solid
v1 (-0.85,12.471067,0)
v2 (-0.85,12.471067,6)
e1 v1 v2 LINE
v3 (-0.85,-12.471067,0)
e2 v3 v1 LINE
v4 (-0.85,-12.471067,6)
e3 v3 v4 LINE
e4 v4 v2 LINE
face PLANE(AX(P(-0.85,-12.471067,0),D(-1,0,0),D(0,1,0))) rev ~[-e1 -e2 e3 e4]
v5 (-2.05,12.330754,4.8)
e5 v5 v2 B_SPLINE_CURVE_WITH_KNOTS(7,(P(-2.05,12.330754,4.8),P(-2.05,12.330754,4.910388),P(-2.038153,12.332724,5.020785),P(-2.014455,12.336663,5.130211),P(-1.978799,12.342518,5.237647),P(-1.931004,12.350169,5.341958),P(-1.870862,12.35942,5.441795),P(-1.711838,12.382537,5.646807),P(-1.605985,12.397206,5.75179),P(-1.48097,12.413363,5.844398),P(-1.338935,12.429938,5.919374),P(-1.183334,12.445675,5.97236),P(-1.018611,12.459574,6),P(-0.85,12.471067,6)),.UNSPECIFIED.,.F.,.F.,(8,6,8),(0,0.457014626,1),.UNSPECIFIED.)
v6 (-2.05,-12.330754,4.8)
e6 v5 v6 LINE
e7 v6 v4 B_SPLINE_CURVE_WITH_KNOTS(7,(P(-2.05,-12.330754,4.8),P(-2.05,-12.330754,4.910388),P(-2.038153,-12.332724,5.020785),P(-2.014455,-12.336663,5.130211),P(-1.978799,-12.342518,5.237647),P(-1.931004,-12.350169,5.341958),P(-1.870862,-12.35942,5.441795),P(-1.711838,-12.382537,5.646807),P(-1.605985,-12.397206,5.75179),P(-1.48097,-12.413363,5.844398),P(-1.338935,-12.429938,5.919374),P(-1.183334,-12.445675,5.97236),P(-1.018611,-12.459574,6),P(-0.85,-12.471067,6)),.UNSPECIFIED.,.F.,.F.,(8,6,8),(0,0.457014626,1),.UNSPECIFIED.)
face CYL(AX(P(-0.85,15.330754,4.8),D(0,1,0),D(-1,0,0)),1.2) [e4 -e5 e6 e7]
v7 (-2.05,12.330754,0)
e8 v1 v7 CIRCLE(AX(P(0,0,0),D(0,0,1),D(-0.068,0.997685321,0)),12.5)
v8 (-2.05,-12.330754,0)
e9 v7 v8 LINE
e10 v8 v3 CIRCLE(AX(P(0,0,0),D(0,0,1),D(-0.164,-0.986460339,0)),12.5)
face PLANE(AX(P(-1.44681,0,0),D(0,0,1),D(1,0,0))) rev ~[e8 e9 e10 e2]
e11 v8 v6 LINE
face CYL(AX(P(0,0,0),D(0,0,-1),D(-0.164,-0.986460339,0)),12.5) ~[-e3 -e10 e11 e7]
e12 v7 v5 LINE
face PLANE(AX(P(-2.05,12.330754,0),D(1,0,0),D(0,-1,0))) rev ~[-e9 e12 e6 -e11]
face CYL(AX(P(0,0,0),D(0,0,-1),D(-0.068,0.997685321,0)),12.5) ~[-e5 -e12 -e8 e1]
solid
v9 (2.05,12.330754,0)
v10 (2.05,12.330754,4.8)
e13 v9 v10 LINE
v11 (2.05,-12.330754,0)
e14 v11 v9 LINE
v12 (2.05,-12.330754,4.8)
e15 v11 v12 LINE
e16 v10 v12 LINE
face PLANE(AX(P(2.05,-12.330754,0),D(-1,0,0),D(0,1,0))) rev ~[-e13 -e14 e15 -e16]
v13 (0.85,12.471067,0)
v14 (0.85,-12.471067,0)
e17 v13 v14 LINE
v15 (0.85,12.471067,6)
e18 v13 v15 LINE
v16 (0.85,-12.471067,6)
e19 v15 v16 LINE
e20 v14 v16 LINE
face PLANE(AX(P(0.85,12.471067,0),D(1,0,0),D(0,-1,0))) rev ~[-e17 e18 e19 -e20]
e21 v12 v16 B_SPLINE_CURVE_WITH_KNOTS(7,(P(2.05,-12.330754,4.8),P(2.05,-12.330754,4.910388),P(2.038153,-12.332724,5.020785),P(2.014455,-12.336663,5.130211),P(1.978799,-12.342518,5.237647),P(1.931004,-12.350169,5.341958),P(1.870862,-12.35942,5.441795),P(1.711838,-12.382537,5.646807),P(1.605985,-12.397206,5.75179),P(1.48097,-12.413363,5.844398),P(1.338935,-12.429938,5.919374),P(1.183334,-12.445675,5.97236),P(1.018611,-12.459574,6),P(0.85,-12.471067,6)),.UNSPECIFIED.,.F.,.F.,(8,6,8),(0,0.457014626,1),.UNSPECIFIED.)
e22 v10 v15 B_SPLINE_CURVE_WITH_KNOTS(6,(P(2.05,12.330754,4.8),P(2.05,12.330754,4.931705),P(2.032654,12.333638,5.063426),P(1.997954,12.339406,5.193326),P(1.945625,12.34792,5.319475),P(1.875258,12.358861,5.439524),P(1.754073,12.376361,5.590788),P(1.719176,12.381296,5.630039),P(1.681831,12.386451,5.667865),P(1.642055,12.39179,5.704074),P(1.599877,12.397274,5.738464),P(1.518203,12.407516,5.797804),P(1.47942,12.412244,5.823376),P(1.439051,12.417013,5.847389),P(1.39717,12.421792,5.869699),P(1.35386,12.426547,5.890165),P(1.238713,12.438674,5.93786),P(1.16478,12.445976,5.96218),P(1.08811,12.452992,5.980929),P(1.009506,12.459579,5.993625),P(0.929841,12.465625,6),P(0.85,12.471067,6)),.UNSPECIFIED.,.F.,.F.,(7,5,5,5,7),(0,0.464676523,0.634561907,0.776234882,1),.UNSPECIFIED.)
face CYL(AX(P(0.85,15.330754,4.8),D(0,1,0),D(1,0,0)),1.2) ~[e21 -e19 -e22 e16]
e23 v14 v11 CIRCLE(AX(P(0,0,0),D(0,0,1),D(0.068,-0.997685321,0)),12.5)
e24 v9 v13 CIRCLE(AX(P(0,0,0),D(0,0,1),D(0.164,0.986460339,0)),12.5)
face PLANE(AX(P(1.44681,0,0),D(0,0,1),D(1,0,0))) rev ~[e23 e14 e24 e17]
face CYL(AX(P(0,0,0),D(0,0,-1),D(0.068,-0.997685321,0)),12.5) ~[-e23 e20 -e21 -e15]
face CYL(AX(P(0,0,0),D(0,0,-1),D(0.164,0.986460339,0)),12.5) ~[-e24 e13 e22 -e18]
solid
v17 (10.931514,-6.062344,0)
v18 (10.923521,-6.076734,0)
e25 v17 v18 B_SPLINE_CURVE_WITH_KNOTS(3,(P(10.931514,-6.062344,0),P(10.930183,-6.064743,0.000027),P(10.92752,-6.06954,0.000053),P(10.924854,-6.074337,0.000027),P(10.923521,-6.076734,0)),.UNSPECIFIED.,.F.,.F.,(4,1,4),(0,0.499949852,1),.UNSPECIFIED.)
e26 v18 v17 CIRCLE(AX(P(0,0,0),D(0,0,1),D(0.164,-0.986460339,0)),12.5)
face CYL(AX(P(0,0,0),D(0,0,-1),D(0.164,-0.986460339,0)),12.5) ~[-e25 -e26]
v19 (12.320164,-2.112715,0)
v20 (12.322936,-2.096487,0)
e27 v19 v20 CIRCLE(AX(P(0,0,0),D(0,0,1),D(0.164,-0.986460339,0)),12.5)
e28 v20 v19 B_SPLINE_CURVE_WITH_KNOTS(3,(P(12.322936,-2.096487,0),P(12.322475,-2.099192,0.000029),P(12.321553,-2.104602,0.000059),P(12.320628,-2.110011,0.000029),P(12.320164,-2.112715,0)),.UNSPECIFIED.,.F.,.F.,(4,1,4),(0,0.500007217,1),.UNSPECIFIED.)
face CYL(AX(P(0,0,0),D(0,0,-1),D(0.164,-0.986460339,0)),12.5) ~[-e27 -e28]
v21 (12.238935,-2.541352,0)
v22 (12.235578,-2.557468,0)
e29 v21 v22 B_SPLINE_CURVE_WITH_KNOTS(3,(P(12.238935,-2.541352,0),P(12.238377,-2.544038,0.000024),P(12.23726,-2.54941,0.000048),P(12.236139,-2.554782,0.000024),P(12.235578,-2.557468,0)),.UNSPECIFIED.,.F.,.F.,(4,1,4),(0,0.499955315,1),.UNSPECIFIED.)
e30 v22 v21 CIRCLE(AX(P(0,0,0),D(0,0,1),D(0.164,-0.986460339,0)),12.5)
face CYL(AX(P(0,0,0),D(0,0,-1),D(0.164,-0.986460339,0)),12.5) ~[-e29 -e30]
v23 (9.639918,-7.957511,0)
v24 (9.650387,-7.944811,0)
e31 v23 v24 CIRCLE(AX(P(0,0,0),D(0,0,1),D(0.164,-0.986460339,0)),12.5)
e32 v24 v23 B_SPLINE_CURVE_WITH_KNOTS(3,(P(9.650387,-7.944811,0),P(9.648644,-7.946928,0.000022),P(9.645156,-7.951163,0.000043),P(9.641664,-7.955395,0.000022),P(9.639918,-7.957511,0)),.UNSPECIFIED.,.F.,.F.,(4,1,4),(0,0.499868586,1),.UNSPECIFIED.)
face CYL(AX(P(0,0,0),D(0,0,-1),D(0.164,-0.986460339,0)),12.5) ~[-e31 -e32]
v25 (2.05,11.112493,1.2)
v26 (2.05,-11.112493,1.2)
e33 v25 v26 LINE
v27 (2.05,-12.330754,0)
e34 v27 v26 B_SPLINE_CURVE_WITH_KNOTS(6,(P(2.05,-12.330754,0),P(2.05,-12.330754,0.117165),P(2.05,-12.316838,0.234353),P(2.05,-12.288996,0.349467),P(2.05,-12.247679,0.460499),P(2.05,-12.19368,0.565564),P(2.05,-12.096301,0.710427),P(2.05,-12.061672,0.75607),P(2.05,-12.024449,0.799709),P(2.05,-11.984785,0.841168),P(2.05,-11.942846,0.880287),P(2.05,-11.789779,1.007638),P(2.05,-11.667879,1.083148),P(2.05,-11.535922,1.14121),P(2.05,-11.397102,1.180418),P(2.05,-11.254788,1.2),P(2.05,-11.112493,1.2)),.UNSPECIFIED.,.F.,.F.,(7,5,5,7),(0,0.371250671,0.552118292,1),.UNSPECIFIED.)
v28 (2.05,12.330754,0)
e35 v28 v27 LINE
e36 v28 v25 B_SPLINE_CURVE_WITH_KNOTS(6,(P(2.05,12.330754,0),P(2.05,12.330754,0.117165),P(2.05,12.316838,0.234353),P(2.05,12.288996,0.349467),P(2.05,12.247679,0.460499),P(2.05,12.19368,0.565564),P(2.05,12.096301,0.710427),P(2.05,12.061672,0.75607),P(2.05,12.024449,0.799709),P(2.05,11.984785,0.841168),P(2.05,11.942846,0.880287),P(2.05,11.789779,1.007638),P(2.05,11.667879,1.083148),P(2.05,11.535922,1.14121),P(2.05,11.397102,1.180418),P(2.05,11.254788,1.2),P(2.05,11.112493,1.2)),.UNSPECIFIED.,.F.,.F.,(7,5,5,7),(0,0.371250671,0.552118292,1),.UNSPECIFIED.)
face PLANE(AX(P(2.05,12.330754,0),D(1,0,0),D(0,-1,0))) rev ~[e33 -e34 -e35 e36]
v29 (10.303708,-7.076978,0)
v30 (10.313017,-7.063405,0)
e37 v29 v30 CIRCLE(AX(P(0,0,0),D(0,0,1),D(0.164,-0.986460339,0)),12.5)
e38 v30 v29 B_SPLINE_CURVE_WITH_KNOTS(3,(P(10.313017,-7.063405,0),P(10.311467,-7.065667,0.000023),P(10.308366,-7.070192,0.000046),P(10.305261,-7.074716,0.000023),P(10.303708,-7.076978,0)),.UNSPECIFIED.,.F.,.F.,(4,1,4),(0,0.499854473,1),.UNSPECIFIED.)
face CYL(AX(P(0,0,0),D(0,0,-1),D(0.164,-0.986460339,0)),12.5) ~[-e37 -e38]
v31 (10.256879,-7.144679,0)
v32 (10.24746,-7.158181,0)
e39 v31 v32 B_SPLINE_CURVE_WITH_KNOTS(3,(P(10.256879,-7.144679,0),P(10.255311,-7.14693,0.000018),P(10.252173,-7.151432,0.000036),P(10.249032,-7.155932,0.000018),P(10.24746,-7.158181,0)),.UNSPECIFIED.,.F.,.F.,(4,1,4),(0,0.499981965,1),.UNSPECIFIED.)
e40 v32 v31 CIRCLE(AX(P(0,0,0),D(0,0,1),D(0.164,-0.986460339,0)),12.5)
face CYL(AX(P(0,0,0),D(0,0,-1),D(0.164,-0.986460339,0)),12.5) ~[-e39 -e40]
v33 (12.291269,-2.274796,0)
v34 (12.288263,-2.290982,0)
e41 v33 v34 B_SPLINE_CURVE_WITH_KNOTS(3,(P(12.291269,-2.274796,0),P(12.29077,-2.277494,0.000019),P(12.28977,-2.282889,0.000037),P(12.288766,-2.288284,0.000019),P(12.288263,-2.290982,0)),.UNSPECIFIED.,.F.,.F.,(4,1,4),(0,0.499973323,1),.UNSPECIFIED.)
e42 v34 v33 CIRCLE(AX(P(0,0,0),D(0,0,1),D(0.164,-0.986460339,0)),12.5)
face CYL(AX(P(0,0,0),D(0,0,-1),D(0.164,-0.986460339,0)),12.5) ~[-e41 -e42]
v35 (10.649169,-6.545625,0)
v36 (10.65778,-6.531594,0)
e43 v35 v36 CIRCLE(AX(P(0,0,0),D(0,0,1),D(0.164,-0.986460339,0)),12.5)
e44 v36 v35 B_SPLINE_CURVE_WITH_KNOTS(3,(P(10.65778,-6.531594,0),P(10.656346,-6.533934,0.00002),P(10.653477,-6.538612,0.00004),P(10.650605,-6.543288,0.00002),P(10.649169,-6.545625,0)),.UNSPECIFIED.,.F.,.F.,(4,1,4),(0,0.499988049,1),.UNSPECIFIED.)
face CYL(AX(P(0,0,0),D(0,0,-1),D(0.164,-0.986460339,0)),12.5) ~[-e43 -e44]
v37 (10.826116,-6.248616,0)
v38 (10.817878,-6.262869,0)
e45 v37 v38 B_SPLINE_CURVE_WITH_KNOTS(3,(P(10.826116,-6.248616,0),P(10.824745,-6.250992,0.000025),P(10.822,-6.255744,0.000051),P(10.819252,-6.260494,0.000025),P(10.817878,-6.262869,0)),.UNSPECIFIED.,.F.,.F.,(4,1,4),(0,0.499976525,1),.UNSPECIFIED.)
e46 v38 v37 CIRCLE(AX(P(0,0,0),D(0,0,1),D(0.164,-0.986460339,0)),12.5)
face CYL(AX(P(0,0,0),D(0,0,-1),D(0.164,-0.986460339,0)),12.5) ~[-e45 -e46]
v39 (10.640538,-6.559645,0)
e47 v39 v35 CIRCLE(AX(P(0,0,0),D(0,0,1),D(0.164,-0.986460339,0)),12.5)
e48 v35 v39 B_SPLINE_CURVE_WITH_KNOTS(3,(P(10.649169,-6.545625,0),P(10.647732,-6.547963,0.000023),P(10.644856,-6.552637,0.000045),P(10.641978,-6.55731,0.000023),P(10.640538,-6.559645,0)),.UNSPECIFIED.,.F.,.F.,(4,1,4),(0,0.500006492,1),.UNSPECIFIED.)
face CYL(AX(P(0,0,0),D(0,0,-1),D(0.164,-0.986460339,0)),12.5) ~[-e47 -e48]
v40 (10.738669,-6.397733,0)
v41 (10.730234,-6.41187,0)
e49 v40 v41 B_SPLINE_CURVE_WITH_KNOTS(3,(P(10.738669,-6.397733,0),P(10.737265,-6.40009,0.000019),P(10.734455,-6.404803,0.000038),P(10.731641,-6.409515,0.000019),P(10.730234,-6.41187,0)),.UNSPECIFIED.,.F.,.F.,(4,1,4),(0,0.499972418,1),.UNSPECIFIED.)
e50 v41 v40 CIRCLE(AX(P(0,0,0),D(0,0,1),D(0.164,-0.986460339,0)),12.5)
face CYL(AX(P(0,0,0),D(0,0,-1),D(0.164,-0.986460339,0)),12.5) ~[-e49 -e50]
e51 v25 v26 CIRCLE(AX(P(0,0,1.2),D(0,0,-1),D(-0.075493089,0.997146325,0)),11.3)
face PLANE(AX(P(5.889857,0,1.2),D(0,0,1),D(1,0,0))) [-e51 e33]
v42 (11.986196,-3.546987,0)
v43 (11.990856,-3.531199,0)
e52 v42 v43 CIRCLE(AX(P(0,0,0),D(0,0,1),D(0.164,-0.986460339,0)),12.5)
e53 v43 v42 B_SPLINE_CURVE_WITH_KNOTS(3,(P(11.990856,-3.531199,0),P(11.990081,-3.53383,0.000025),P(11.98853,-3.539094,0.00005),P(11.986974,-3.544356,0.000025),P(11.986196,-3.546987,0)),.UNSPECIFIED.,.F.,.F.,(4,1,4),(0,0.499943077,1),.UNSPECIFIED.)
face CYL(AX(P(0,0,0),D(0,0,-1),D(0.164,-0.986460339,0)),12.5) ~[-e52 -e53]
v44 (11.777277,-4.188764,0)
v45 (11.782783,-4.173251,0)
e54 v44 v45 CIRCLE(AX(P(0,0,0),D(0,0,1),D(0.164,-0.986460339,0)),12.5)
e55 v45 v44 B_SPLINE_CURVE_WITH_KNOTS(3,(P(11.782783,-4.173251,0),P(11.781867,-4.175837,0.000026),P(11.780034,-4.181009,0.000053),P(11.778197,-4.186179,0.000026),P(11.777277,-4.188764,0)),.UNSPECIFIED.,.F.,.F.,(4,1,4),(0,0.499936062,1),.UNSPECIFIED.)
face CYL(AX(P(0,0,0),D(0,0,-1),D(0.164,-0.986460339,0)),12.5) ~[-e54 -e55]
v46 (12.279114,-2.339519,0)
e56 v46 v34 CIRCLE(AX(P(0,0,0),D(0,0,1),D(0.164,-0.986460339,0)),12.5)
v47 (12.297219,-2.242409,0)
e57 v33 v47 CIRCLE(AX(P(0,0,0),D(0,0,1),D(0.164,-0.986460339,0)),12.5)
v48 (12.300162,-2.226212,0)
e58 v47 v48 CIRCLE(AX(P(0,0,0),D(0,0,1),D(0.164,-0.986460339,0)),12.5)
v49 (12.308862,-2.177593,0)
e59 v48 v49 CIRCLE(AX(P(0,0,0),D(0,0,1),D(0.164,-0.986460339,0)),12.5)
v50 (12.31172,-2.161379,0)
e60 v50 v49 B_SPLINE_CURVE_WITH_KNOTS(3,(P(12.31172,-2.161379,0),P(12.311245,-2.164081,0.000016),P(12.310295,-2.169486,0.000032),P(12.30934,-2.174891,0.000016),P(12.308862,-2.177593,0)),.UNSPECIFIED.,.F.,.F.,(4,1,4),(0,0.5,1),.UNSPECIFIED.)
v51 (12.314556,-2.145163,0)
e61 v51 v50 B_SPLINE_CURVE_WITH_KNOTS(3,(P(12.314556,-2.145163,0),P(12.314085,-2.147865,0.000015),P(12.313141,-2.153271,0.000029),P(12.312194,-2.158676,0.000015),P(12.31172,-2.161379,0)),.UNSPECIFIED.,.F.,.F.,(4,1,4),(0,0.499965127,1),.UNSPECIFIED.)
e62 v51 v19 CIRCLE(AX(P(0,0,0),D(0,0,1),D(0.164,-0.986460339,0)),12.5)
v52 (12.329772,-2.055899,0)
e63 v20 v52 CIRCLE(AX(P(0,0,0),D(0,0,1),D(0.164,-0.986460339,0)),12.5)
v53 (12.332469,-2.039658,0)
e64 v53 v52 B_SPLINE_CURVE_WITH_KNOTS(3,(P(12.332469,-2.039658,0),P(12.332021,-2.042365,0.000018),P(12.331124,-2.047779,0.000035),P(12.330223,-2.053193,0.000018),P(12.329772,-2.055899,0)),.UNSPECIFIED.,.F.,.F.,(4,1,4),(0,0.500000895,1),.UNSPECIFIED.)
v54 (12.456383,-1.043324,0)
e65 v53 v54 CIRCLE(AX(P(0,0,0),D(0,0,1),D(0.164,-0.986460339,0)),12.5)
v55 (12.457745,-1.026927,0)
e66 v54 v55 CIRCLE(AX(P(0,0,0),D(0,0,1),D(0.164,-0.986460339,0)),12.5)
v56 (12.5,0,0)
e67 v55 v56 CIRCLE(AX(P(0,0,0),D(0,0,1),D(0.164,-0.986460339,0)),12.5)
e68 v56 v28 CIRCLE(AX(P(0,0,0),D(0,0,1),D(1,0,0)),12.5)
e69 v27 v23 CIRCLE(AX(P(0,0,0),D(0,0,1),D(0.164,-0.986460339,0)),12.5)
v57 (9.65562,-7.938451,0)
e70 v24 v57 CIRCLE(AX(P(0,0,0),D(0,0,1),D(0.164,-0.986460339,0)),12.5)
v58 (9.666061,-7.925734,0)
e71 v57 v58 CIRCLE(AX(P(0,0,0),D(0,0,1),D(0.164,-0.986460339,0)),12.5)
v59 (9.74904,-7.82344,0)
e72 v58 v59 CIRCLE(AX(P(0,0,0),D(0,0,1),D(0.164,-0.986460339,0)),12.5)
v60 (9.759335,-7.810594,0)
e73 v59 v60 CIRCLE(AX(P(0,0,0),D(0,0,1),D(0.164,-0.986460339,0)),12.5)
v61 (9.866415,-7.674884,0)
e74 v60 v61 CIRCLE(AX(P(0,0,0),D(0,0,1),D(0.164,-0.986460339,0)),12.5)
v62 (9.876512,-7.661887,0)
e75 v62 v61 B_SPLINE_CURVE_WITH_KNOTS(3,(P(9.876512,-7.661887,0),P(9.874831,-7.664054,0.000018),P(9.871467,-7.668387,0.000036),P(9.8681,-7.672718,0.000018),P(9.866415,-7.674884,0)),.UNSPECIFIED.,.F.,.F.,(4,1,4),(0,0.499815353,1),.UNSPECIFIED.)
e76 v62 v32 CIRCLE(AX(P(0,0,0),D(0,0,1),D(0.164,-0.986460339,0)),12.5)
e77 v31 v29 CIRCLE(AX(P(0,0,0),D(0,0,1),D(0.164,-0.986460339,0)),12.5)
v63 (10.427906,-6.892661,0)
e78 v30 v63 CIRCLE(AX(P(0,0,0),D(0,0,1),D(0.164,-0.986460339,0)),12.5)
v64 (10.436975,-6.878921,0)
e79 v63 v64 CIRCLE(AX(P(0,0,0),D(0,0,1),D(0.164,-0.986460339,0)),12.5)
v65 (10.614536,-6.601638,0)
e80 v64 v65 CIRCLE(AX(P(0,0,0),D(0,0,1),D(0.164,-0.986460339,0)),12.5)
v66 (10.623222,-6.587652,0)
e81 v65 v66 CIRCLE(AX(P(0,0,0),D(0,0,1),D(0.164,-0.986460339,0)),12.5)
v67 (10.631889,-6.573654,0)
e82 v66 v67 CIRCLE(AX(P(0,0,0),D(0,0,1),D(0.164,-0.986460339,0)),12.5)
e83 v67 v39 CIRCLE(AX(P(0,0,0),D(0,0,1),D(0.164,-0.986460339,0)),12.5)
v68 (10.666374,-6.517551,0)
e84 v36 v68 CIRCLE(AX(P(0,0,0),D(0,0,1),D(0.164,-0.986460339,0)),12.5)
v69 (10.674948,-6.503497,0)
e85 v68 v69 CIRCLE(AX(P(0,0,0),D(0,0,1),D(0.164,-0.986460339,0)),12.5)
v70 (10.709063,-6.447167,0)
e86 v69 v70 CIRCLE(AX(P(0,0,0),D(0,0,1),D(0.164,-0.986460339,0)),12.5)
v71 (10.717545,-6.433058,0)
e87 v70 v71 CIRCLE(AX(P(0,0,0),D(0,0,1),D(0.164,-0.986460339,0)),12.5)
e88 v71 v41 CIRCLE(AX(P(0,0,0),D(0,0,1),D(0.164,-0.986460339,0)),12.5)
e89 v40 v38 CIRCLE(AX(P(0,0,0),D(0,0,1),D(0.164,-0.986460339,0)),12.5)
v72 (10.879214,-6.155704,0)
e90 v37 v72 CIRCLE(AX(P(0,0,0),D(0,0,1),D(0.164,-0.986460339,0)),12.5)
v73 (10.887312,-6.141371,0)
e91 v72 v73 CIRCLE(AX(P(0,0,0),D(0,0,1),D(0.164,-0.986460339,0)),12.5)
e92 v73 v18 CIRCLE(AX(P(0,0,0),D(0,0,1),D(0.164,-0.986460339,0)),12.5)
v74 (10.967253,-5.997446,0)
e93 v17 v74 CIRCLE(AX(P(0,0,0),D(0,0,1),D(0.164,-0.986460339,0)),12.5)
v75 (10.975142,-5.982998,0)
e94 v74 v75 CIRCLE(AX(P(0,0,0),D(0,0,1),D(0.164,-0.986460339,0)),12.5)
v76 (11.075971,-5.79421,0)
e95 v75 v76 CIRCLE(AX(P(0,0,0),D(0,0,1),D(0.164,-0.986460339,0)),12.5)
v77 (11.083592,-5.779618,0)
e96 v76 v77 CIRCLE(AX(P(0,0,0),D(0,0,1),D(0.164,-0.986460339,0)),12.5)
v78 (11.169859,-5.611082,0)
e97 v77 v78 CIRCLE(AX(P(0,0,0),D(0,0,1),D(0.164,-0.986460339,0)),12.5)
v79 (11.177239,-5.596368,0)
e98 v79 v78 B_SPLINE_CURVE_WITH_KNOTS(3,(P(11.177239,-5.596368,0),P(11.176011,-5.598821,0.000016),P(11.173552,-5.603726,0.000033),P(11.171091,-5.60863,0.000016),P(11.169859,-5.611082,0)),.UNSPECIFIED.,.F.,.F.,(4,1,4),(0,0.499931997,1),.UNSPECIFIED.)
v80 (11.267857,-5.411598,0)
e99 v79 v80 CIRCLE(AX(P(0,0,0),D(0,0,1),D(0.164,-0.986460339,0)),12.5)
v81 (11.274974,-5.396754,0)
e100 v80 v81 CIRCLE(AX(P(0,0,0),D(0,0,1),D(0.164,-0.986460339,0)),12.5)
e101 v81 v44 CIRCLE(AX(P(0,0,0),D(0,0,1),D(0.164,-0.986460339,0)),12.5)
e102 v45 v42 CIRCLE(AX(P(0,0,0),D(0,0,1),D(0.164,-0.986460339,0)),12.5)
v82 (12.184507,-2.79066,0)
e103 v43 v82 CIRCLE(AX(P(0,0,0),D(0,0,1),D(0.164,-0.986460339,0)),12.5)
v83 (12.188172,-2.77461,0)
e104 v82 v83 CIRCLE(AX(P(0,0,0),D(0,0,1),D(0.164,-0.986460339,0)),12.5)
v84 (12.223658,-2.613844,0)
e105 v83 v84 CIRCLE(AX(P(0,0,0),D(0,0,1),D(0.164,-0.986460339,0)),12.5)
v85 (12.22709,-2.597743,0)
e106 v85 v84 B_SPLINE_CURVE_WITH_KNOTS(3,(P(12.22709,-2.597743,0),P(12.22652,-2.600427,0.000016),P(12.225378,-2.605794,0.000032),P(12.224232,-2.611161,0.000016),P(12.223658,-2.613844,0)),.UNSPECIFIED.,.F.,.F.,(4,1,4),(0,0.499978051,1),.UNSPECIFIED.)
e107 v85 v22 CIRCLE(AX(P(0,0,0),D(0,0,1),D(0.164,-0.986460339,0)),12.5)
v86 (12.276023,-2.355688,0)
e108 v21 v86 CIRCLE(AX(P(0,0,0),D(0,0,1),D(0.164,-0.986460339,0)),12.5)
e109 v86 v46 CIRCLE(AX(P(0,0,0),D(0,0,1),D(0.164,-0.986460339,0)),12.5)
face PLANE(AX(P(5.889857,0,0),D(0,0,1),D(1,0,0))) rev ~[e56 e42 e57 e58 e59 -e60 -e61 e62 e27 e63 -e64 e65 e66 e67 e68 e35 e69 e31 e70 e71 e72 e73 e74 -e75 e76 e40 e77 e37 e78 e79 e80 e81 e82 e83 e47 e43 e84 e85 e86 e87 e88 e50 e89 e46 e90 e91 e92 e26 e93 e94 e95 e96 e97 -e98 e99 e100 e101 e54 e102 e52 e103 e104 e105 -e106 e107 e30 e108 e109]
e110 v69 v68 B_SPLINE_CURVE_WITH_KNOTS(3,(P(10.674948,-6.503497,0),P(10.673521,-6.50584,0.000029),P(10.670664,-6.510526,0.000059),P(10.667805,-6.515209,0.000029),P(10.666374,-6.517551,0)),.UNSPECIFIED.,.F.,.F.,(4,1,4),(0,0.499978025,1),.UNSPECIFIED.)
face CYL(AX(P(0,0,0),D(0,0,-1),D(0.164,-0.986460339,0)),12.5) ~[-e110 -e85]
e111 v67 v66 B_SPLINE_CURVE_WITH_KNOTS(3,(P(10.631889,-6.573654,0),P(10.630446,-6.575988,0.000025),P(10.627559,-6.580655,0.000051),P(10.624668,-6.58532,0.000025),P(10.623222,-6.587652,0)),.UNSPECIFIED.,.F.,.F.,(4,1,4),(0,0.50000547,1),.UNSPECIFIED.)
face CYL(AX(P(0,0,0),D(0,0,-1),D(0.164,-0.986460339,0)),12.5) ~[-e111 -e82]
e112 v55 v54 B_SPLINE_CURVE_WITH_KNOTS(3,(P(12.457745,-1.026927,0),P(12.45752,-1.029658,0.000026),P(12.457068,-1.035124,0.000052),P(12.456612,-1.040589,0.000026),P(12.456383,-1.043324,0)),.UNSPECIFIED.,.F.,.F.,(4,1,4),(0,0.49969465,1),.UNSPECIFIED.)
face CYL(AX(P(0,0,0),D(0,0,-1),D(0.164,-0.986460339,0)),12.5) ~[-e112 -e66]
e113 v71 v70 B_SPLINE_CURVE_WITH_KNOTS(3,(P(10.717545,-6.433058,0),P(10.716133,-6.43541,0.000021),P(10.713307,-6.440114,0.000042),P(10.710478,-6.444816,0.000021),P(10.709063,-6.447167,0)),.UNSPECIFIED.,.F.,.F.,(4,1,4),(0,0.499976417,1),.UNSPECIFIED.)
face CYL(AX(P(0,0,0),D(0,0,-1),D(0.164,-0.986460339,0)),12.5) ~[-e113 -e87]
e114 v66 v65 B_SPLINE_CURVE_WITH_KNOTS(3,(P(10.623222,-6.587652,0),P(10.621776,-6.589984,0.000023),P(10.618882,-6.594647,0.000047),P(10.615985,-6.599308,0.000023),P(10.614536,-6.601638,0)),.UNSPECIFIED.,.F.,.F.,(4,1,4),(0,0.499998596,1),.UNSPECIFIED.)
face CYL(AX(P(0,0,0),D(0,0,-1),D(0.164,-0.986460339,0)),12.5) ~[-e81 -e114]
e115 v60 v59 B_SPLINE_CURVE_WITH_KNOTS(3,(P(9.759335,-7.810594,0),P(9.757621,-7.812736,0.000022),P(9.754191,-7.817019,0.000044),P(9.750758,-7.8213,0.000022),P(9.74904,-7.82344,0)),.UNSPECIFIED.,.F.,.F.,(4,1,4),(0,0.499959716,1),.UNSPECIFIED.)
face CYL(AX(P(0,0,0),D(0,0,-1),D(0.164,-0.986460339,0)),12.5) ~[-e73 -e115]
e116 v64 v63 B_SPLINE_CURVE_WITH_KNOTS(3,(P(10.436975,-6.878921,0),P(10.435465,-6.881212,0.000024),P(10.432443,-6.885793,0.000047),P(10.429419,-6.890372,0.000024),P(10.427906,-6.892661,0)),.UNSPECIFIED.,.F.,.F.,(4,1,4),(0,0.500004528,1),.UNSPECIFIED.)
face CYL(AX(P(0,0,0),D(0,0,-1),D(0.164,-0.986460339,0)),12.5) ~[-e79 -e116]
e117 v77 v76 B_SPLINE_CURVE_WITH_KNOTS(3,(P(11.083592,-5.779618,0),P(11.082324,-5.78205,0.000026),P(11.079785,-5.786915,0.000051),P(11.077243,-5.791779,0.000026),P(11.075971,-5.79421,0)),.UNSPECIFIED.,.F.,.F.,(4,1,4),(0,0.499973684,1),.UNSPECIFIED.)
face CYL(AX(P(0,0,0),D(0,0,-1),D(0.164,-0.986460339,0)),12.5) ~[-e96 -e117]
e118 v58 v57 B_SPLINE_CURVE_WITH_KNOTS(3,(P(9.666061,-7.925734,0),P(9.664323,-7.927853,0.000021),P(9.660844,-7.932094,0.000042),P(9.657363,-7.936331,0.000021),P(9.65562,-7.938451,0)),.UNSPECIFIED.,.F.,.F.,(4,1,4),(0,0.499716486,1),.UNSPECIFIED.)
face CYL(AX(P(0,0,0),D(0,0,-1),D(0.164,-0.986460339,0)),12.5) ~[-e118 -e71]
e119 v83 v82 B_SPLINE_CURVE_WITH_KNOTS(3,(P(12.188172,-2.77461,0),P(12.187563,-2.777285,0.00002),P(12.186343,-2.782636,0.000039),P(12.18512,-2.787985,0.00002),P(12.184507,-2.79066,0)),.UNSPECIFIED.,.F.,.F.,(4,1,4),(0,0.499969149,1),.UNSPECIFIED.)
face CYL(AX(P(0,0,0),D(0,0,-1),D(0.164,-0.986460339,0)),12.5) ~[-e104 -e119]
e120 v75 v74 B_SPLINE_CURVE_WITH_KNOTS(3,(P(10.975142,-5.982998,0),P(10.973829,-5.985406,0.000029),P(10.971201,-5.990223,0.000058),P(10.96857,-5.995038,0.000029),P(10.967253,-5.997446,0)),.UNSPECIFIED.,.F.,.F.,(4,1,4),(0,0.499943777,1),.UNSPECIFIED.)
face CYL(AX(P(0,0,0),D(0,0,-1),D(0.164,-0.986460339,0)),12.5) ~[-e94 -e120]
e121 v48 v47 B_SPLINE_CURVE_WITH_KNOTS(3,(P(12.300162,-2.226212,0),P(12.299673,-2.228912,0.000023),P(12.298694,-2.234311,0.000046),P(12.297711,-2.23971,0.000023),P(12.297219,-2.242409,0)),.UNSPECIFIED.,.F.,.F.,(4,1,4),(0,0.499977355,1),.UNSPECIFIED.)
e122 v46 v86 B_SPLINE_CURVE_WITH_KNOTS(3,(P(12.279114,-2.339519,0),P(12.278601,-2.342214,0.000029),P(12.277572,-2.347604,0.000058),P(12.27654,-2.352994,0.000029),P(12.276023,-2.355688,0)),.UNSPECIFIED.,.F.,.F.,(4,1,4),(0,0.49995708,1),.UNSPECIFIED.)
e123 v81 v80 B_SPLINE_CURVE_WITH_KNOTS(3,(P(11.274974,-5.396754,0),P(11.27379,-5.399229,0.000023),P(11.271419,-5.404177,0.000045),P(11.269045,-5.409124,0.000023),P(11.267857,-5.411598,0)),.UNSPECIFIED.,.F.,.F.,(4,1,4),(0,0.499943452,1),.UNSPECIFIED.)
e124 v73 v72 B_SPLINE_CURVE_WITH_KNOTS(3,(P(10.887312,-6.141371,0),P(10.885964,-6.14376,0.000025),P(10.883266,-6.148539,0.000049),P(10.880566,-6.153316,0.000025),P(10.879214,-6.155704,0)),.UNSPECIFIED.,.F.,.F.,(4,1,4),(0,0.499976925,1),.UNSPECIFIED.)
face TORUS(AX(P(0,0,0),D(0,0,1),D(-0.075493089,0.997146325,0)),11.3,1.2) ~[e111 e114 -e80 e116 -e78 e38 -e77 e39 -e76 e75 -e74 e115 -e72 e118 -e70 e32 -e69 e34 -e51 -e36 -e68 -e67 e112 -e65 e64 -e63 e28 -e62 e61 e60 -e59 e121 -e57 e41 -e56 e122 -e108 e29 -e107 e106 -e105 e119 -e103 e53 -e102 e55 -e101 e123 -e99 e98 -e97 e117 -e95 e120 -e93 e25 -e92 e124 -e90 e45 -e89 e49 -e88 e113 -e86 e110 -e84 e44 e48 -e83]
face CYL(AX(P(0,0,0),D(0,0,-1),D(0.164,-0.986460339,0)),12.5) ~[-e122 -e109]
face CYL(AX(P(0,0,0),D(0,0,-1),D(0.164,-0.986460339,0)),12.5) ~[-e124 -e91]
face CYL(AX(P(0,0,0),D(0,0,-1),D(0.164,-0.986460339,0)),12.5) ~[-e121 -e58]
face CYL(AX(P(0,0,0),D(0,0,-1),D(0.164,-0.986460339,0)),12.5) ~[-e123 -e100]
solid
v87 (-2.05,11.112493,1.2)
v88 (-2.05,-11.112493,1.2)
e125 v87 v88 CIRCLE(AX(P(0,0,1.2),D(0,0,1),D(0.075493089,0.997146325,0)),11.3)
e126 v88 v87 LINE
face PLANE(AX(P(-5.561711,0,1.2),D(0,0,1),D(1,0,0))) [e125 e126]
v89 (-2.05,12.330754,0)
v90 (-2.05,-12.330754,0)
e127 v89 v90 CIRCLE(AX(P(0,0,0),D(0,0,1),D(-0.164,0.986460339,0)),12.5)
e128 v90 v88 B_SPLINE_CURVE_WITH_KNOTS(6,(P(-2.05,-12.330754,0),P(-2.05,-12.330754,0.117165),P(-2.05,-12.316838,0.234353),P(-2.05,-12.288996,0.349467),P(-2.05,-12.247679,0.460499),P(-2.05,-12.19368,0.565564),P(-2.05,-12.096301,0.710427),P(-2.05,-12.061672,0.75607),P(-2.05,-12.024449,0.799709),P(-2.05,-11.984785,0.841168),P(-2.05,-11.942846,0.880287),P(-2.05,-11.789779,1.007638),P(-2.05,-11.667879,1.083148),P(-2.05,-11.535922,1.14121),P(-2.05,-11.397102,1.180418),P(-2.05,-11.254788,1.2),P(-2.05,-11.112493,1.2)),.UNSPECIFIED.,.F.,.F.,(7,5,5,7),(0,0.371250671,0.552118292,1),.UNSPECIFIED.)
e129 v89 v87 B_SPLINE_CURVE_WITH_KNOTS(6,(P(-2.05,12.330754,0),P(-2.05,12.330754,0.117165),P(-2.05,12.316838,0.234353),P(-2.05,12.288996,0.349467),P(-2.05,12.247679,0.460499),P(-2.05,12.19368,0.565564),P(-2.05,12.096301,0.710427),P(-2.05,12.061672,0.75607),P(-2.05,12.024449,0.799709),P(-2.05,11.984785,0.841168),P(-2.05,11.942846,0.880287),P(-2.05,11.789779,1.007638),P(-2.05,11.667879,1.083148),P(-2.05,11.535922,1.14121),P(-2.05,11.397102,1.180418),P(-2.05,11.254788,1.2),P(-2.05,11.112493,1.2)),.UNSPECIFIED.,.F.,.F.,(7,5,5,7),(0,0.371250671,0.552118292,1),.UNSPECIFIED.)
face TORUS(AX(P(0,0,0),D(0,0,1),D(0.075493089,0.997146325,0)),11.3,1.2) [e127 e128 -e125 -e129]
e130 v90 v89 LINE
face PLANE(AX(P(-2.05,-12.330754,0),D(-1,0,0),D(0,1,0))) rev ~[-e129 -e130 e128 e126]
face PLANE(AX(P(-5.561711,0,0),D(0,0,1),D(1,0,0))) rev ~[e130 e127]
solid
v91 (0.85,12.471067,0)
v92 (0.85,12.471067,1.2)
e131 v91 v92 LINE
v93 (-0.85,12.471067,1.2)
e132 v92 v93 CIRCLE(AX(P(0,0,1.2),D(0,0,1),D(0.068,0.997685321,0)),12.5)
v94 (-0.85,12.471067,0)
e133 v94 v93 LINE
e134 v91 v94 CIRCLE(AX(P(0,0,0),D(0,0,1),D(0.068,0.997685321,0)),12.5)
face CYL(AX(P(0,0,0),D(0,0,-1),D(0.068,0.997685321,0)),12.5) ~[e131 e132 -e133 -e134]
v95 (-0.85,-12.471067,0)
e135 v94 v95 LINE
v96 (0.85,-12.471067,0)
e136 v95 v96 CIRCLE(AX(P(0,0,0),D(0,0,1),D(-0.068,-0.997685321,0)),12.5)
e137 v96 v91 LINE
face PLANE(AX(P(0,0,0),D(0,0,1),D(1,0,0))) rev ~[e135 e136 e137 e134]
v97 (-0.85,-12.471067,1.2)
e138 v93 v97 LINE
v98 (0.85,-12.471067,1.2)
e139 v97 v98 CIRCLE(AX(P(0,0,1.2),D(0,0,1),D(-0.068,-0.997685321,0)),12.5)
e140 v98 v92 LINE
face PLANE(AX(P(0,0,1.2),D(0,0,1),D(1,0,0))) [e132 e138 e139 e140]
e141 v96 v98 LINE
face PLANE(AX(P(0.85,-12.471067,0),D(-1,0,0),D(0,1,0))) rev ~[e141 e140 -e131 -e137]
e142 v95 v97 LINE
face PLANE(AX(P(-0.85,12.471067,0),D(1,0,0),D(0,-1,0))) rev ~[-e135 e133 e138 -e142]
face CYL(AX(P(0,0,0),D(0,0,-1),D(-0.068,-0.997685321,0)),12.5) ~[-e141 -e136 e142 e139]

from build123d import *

# Parameters (mm, degrees)
F1_DEPTH      = 1.2
F2_DEPTH      = 6
F3_T2_ANGLE   = 188.6591090802
F3_2_T2_ANGLE = 188.6591090802
F3_3_T1_DEPTH = 30.6615084697
F3_4_T1_DEPTH = 30.6615084697


# Not quite as in the source:
# - a fillet or chamfer that OpenCascade refuses, or shapes differently, is made with other operations: its cross-section is extruded or revolved along the edge and cut away or added


with BuildPart() as f1:
    # F0 (on Top) → F1 (new body)
    with BuildSketch(Plane.XY):
        with BuildLine():
            Line((-2.05, -12.3307542348), (-2.05, 12.3307542348))
            ThreePointArc((-2.05, 12.3307542348), (-12.5, 0), (-2.05, -12.3307542348))
        make_face()
    extrude(amount=F1_DEPTH)

    # F3: fillet of radius 1.2 on 1 edges, made by hand

    # F3_s1 → F3_t2 (revolve, cut)
    with BuildSketch(Plane(origin=(0, 0, 0), x_dir=(0, 0, 1), z_dir=(0.997146325, -0.0754930889, 0))):
        with BuildLine():
            ThreePointArc((0, -12.5), (0.8485281374, -12.1485281374), (1.2, -11.3))
            Line((1.2, -11.3), (1.2, -12.5))
            Line((1.2, -12.5), (0, -12.5))
        make_face()
    revolve(axis=Axis((0, 0, 1.2), (0, 0, 1)), revolution_arc=F3_T2_ANGLE, mode=Mode.SUBTRACT)


with BuildPart() as f1b:
    # F0 (on Top) → F1, piece 2 (new body)
    with BuildSketch(Plane.XY):
        with BuildLine():
            Line((0.85, -12.4710665141), (0.85, 12.4710665141))
            ThreePointArc((0.85, 12.4710665141), (0, 12.5), (-0.85, 12.4710665141))
            Line((-0.85, 12.4710665141), (-0.85, -12.4710665141))
            ThreePointArc((-0.85, -12.4710665141), (0, -12.5), (0.85, -12.4710665141))
        make_face()
    extrude(amount=F1_DEPTH)


with BuildPart() as f1c:
    # F0 (on Top) → F1, piece 3 (new body)
    with BuildSketch(Plane.XY):
        with BuildLine():
            ThreePointArc((2.05, -12.3307542348), (9.5361155614, -8.0816149376), (12.5, 0))
            ThreePointArc((12.5, 0), (9.5361155614, 8.0816149376), (2.05, 12.3307542348))
            Line((2.05, 12.3307542348), (2.05, -12.3307542348))
        make_face()
    extrude(amount=F1_DEPTH)

    # F3#2: fillet of radius 1.2 on 1 edges, made by hand

    # F3_2_s1 → F3_2_t2 (revolve, cut)
    with BuildSketch(Plane(origin=(0, 0, 0), x_dir=(0, 0, 1), z_dir=(-0.997146325, -0.0754930889, 0))):
        with BuildLine():
            ThreePointArc((0, 12.5), (0.8485281374, 12.1485281374), (1.2, 11.3))
            Line((1.2, 11.3), (1.2, 12.5))
            Line((1.2, 12.5), (0, 12.5))
        make_face()
    revolve(axis=Axis((0, 0, 1.2), (0, 0, -1)), revolution_arc=F3_2_T2_ANGLE, mode=Mode.SUBTRACT)


with BuildPart() as f2:
    # F0 (on Top) → F2 (new body)
    with BuildSketch(Plane.XY):
        with BuildLine():
            Line((2.05, -12.3307542348), (2.05, 12.3307542348))
            ThreePointArc((2.05, 12.3307542348), (1.4516962092, 12.415416953), (0.85, 12.4710665141))
            Line((0.85, 12.4710665141), (0.85, -12.4710665141))
            ThreePointArc((0.85, -12.4710665141), (1.4516962092, -12.415416953), (2.05, -12.3307542348))
        make_face()
    extrude(amount=F2_DEPTH)

    # F3#3: fillet of radius 1.2 on 1 edges, made by hand

    # F3_3_s2 → F3_3_t1 (cut)
    with BuildSketch(Plane.XZ.offset(-15.3307542348)):
        with BuildLine():
            ThreePointArc((2.05, 4.8), (1.6985281374, 5.6485281374), (0.85, 6))
            Line((0.85, 6), (2.05, 6))
            Line((2.05, 6), (2.05, 4.8))
        make_face()
    extrude(amount=F3_3_T1_DEPTH, mode=Mode.SUBTRACT)


with BuildPart() as f2b:
    # F0 (on Top) → F2, piece 2 (new body)
    with BuildSketch(Plane.XY):
        with BuildLine():
            Line((-0.85, -12.4710665141), (-0.85, 12.4710665141))
            ThreePointArc((-0.85, 12.4710665141), (-1.4516962092, 12.415416953), (-2.05, 12.3307542348))
            Line((-2.05, 12.3307542348), (-2.05, -12.3307542348))
            ThreePointArc((-2.05, -12.3307542348), (-1.4516962092, -12.415416953), (-0.85, -12.4710665141))
        make_face()
    extrude(amount=F2_DEPTH)

    # F3#4: fillet of radius 1.2 on 1 edges, made by hand

    # F3_4_s2 → F3_4_t1 (cut)
    with BuildSketch(Plane.XZ.offset(-15.3307542348)):
        with BuildLine():
            ThreePointArc((-2.05, 4.8), (-1.6985281374, 5.6485281374), (-0.85, 6))
            Line((-0.85, 6), (-2.05, 6))
            Line((-2.05, 6), (-2.05, 4.8))
        make_face()
    extrude(amount=F3_4_T1_DEPTH, mode=Mode.SUBTRACT)


solid = Compound([f1.part, f1b.part, f1c.part, f2.part, f2b.part])
